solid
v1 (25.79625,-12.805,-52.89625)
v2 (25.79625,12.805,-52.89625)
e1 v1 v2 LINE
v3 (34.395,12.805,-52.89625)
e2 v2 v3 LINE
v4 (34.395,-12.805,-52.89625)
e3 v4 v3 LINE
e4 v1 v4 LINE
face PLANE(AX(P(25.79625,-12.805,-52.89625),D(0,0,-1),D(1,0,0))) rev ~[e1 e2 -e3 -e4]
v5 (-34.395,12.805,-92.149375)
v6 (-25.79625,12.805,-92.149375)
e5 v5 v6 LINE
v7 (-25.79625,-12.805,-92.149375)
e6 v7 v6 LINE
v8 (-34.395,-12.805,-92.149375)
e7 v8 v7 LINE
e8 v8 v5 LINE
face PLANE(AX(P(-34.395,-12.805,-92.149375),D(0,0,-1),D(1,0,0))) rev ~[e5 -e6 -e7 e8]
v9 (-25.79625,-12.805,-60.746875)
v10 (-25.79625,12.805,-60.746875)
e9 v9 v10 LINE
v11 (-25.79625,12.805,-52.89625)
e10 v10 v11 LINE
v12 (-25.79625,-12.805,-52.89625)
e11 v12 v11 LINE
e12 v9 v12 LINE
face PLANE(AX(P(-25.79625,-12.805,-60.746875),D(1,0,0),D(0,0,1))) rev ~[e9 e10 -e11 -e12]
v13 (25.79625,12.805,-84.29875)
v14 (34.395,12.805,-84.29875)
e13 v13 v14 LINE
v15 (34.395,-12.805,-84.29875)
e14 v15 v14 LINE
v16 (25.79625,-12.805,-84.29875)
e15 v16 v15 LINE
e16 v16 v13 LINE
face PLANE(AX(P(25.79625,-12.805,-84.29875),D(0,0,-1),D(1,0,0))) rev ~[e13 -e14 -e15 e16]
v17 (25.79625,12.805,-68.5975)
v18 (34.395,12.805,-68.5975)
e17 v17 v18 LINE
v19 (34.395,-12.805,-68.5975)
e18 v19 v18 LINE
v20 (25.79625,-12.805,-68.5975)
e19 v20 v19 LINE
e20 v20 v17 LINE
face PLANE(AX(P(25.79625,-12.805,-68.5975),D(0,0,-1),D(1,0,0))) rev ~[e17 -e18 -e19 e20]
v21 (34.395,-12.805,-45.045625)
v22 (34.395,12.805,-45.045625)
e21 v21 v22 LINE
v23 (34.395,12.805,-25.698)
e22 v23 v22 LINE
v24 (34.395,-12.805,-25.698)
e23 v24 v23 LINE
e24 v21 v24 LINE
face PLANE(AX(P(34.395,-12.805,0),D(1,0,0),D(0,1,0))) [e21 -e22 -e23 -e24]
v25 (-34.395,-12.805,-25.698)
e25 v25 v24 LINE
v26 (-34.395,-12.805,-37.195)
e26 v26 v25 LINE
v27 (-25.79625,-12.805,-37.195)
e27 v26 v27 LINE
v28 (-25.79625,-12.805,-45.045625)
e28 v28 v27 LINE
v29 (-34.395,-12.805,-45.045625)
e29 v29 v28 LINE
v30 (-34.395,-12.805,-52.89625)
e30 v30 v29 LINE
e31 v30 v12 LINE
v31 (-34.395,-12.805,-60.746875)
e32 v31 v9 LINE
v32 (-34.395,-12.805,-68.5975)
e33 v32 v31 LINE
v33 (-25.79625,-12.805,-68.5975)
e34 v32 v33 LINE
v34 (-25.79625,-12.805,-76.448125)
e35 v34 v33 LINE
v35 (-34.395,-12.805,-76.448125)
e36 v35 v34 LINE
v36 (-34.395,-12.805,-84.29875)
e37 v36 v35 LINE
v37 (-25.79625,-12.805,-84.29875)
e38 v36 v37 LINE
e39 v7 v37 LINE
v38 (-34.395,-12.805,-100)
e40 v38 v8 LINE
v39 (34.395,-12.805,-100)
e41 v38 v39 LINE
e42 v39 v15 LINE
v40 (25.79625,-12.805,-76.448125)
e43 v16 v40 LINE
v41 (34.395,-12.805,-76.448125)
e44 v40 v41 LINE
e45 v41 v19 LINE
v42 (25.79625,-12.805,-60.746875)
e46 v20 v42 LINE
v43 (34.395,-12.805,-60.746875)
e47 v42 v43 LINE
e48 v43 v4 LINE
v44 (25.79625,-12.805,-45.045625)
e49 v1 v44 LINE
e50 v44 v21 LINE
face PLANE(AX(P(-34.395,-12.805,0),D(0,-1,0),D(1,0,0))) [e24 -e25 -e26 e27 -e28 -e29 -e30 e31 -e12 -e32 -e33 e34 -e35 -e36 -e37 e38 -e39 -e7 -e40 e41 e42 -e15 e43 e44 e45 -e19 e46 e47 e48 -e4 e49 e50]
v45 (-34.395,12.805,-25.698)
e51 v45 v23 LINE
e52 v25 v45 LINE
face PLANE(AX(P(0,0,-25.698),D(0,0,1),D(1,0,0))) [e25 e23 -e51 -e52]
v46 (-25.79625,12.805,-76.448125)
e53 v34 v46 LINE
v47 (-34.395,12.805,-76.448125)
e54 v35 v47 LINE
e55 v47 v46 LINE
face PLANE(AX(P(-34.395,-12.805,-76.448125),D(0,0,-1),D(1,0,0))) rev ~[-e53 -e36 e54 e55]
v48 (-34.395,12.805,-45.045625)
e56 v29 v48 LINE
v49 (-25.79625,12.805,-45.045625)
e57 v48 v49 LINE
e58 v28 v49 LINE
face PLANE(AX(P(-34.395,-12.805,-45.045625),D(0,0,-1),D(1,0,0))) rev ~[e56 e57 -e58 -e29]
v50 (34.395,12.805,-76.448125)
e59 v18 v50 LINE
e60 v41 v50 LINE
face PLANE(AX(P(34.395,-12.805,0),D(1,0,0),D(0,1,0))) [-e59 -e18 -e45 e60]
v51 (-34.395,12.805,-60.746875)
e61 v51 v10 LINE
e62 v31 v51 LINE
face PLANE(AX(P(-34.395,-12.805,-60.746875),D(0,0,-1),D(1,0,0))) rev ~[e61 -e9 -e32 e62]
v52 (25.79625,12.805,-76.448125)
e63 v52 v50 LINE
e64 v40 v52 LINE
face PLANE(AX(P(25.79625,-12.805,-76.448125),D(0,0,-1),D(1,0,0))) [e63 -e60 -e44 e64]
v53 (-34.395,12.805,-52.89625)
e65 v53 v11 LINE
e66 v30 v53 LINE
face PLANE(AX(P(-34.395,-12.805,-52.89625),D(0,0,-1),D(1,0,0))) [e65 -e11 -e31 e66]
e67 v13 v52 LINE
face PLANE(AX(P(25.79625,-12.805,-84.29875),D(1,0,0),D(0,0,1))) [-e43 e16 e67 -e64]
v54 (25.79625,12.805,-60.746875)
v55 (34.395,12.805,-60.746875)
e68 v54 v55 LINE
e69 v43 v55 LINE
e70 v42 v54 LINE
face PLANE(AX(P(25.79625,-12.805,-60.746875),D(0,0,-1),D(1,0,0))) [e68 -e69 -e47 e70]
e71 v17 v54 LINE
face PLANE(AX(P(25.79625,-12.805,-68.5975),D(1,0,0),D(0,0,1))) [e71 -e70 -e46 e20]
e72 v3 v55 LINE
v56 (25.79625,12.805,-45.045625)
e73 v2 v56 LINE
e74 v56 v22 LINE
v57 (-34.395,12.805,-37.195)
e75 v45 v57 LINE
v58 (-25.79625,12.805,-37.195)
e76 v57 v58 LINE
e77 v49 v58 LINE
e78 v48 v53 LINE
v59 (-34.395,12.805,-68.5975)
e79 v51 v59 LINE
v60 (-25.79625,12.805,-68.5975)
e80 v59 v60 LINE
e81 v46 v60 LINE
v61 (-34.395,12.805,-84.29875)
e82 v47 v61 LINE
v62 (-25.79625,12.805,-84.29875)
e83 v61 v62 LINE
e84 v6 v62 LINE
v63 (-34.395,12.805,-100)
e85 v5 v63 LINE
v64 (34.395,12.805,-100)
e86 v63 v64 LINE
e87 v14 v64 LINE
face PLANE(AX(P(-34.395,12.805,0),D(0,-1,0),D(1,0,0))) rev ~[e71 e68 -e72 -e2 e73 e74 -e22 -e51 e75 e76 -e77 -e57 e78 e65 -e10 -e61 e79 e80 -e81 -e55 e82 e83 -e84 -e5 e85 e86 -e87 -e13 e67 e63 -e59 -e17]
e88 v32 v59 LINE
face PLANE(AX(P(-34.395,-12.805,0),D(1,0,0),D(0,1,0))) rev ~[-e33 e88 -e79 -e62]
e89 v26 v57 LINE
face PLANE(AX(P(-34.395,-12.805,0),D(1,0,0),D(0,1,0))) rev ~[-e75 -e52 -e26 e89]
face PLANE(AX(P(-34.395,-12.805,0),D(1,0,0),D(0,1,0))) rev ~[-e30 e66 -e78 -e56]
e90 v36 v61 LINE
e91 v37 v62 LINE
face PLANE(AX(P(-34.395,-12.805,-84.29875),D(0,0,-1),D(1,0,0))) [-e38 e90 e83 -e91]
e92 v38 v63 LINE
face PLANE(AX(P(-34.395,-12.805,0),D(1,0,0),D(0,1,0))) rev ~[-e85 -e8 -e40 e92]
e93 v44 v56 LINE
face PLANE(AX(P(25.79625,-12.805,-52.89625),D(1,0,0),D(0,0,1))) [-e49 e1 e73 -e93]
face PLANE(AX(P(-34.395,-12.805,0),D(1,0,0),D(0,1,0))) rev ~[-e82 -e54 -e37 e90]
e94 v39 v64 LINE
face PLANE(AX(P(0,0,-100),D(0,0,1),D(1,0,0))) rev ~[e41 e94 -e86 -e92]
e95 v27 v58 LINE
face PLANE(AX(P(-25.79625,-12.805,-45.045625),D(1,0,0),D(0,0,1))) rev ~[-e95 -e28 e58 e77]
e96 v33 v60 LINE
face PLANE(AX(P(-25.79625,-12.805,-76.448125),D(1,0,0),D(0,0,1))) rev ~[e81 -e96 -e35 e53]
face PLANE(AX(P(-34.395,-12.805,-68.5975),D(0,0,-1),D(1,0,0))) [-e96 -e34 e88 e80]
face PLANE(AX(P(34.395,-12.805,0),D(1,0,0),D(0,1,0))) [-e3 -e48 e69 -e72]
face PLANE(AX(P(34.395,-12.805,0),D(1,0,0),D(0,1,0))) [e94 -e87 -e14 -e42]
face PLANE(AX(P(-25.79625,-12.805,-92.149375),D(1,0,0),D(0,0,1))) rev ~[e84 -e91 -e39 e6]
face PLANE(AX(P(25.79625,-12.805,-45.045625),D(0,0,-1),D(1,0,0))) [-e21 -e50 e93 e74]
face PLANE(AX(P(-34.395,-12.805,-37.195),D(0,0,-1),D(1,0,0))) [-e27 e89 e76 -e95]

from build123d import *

# Parameters (mm, degrees)
F0_W     = 68.79
F0_H     = 25.61
F1_DEPTH = 25.61
F2_DEPTH = 100
F3_W     = 8.59875
F3_H     = 7.850625
F4_DEPTH = 50
F5_DEPTH = 51.308


with BuildPart() as f1:
    # F0 (on Top) → F1 (new body)
    with BuildSketch(Plane.XY):
        Rectangle(F0_W, F0_H)
    extrude(amount=F1_DEPTH)

    # F2 (add): a face of the model
    f2_faces = [f1.faces().sort_by_distance(p)[0] for p in [
        (0, 0, 0),
    ]]
    extrude(f2_faces, amount=F2_DEPTH)

    # F3 (on face) → F4 (cut)
    with BuildSketch(Plane.XZ.offset(12.805)):
        with Locations((-30.095625, -41.1203125)):
            Rectangle(F3_W, F3_H)
        with Locations((30.095625, -48.9709375)):
            Rectangle(F3_W, F3_H)
        with Locations((-30.095625, -56.8215625)):
            Rectangle(F3_W, F3_H)
        with Locations((30.095625, -64.6721875)):
            Rectangle(F3_W, F3_H)
        with Locations((-30.095625, -72.5228125)):
            Rectangle(F3_W, F3_H)
        with Locations((30.095625, -80.3734375)):
            Rectangle(F3_W, F3_H)
        with Locations((-30.095625, -88.2240625)):
            Rectangle(F3_W, F3_H)
    extrude(amount=-F4_DEPTH, mode=Mode.SUBTRACT)

    # F5 (cut): a face of the model
    f5_faces = [f1.faces().sort_by_distance(p)[0] for p in [
        (0, 0, 25.61),
    ]]
    extrude(f5_faces, amount=-F5_DEPTH, mode=Mode.SUBTRACT)


solid = f1.part
